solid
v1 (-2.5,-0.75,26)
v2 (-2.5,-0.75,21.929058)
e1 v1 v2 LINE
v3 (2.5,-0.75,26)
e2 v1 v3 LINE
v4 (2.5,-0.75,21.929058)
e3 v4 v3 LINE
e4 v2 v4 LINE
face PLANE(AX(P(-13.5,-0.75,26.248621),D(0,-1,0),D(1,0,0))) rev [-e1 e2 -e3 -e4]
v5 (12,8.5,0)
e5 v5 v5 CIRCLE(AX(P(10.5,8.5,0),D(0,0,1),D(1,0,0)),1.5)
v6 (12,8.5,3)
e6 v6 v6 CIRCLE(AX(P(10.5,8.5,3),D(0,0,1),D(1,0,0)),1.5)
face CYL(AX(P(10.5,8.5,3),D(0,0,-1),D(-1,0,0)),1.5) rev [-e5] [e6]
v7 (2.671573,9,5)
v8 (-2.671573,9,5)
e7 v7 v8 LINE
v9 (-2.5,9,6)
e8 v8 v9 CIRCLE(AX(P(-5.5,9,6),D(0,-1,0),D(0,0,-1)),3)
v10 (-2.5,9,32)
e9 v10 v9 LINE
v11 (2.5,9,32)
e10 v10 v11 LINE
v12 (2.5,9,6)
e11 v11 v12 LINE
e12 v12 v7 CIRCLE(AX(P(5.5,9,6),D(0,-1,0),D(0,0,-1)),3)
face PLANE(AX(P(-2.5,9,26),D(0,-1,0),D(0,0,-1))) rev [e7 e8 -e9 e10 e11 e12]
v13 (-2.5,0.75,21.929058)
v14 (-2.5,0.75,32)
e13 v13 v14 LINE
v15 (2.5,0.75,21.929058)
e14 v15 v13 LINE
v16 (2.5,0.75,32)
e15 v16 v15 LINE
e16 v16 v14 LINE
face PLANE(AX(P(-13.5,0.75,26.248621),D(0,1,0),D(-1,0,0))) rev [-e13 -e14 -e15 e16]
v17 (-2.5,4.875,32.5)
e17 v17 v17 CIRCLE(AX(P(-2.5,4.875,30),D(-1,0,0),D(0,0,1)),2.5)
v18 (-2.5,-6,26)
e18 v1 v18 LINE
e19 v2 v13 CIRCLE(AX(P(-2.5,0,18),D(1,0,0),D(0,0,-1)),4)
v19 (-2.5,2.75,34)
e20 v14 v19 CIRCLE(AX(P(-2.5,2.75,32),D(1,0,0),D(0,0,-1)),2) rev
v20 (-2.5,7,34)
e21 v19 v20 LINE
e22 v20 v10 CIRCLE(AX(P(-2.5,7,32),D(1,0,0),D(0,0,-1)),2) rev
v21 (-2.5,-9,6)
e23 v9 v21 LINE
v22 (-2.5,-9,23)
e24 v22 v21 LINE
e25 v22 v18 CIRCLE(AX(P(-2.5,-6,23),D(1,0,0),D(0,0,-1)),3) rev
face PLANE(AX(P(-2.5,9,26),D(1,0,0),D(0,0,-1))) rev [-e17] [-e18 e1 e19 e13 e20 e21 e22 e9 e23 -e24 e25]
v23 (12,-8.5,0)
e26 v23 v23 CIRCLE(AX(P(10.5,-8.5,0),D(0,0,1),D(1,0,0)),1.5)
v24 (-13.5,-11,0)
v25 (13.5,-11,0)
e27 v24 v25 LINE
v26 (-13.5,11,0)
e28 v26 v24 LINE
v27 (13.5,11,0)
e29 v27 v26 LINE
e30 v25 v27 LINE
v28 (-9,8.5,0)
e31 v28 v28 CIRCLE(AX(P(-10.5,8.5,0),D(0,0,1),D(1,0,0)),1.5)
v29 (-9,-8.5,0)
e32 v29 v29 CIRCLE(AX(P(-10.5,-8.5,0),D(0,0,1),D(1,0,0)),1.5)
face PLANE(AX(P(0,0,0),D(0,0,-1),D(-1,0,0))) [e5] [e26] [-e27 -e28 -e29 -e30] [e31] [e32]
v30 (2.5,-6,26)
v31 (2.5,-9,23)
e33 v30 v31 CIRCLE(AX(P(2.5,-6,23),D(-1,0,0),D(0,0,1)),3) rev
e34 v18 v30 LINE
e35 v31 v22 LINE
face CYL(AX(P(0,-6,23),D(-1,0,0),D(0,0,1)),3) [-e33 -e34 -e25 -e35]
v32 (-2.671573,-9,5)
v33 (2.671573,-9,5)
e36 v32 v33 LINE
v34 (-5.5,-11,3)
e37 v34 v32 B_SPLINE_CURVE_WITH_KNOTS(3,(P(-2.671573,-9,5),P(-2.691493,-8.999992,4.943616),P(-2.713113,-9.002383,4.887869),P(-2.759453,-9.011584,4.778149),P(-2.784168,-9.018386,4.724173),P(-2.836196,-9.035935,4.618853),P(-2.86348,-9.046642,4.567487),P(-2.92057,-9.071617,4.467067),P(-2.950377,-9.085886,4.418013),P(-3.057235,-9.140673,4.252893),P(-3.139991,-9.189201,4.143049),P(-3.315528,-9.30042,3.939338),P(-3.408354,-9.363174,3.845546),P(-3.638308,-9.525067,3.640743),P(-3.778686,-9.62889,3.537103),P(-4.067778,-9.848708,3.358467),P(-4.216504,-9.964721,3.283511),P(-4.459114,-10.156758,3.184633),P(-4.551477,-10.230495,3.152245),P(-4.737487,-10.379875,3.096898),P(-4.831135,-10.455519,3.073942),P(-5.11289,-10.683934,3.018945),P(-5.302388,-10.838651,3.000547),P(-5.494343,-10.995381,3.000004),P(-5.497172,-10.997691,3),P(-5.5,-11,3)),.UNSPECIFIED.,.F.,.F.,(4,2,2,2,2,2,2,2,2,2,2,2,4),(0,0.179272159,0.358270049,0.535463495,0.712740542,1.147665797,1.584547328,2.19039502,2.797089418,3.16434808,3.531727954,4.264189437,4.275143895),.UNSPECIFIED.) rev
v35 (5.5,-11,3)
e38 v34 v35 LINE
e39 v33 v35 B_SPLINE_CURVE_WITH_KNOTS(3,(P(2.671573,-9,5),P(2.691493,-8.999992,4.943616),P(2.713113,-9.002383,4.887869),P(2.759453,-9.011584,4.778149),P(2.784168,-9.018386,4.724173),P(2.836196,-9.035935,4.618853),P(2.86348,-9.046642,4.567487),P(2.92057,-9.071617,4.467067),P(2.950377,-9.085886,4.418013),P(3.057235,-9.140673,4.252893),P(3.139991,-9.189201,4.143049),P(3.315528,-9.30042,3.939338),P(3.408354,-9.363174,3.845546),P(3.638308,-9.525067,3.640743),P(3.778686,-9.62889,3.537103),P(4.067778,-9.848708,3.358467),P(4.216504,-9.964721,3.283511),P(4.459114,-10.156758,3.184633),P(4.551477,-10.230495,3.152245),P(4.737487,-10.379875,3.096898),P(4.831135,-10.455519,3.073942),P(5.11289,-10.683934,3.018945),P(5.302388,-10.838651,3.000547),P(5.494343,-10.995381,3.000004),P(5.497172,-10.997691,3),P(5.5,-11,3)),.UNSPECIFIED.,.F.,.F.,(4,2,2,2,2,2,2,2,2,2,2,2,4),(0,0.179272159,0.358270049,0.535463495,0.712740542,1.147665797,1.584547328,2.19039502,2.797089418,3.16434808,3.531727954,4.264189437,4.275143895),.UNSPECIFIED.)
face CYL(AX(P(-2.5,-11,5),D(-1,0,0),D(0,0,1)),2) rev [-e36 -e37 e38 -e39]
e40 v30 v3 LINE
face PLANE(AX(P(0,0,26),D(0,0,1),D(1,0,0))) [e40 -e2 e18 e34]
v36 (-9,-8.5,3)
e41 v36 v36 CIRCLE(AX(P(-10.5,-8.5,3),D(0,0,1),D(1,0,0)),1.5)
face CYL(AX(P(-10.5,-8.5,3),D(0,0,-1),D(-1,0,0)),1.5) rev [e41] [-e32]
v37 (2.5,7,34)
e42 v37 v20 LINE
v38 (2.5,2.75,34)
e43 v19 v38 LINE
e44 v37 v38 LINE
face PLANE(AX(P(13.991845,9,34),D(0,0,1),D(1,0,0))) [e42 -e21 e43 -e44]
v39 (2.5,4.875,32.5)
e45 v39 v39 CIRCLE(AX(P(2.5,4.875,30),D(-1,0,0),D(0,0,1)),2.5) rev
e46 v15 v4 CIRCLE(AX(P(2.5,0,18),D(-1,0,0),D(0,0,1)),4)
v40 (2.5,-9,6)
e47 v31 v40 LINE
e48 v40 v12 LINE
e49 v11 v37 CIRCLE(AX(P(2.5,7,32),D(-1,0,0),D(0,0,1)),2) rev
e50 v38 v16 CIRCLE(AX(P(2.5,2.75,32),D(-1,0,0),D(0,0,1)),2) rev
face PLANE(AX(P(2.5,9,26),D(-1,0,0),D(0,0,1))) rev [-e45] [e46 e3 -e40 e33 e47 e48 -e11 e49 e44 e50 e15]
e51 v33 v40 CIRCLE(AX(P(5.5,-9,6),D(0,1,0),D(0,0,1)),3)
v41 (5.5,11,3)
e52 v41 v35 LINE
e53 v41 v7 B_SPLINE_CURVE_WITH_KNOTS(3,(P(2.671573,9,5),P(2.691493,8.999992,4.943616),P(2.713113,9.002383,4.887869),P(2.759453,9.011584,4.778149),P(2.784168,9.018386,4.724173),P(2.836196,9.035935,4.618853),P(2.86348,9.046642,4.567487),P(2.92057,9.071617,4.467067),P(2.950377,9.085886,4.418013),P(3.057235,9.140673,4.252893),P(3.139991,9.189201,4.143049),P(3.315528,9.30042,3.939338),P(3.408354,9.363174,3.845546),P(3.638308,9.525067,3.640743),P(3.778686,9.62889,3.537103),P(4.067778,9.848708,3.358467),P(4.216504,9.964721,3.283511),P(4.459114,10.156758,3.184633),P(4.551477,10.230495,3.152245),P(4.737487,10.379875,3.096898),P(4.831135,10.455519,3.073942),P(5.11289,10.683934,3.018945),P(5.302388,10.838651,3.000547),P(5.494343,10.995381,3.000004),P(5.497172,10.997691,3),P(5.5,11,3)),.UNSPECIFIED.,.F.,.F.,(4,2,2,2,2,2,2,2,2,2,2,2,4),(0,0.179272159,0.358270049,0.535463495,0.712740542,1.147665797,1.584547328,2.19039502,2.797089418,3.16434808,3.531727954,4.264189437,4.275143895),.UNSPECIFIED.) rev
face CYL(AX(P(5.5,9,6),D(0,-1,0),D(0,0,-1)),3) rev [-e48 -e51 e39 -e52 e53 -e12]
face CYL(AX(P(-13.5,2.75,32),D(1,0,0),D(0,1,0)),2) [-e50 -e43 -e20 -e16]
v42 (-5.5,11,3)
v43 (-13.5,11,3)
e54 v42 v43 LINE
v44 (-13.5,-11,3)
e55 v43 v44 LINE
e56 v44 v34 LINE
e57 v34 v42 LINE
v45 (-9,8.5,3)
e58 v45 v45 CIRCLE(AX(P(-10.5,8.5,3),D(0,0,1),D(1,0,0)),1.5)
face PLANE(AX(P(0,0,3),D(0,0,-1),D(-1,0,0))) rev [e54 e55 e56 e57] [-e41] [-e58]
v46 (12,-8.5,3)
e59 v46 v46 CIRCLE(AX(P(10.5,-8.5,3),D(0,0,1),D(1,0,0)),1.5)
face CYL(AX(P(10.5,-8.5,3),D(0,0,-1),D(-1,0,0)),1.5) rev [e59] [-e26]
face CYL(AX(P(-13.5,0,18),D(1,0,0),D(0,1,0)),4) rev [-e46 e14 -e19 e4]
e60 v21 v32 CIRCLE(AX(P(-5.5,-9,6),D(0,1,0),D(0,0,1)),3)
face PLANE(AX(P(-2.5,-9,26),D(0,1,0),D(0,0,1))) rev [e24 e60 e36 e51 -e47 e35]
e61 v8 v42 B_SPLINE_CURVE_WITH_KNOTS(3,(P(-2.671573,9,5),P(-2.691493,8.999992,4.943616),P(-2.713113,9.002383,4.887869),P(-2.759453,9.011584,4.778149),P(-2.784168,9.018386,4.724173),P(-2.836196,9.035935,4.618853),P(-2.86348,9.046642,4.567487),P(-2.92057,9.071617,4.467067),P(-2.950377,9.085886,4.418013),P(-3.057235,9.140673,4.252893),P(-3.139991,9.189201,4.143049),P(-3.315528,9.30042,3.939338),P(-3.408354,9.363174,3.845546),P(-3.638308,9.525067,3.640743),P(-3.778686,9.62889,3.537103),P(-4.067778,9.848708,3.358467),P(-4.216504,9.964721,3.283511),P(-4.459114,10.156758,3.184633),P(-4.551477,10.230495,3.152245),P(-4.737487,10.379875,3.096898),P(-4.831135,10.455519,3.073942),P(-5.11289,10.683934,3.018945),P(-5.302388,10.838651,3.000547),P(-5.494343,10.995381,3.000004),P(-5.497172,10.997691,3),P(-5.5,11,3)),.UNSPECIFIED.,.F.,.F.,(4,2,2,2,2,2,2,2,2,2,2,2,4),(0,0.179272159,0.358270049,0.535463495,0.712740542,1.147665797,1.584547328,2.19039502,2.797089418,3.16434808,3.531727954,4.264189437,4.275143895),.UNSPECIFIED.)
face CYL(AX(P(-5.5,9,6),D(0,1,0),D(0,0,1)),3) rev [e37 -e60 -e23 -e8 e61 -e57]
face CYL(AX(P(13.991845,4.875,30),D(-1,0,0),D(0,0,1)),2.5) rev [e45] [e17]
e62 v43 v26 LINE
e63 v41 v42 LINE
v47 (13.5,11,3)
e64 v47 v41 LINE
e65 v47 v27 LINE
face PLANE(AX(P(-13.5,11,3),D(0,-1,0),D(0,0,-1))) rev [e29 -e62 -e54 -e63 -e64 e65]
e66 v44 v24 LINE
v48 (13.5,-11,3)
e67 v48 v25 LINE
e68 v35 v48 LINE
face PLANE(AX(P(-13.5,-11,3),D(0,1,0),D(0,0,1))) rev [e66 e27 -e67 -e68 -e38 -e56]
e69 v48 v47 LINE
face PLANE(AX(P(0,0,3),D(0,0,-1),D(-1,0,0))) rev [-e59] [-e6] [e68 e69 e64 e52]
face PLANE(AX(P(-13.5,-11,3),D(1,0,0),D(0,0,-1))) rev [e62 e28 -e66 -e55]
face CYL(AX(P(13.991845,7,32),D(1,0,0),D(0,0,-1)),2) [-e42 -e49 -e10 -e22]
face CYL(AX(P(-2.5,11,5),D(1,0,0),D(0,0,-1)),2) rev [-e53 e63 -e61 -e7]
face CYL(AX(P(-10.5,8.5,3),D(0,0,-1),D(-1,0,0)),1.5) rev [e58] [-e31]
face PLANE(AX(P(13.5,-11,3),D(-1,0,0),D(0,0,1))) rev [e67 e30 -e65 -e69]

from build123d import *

# Parameters (mm, degrees)
SKETCH1_W               = 27
SKETCH1_H               = 22
SKETCH1_R               = 1.5
BOSS_EXTRUDE1_DEPTH     = 3
SKETCH2_W               = 5
SKETCH2_H               = 18
BOSS_EXTRUDE2_DEPTH     = 23
CUT_EXTRUDE1_DEPTH      = 33.449961479
CUT_EXTRUDE1_DEPTH_BACK = 33.449961479
SKETCH3_R               = 4
CUT_EXTRUDE2_DEPTH      = 33.449961479
CUT_EXTRUDE2_DEPTH_BACK = 33.449961479
SKETCH4_W               = 9.515030356
SKETCH4_H               = 1.5
FILLET1_R               = 3
FILLET2_R               = 2
FILLET3_R               = 3
SKETCH6_W               = 8
SKETCH6_H               = 8.25
SKETCH6_R               = 2.5
BOSS_EXTRUDE3_DEPTH     = 5
FILLET4_R               = 2


with BuildPart() as part:
    # Sketch1 → Boss-Extrude1 (new body)
    with BuildSketch(Plane.XY):
        Rectangle(SKETCH1_W, SKETCH1_H)
        with Locations((-10.5, -8.5)):
            Circle(SKETCH1_R, mode=Mode.SUBTRACT)
        with Locations((-10.5, 8.5)):
            Circle(SKETCH1_R, mode=Mode.SUBTRACT)
        with Locations((10.5, 8.5)):
            Circle(SKETCH1_R, mode=Mode.SUBTRACT)
        with Locations((10.5, -8.5)):
            Circle(SKETCH1_R, mode=Mode.SUBTRACT)
    extrude(amount=BOSS_EXTRUDE1_DEPTH)

    # Sketch2 → Boss-Extrude2 (add)
    with BuildSketch(Plane.XY.offset(3)):
        Rectangle(SKETCH2_W, SKETCH2_H)
    extrude(amount=BOSS_EXTRUDE2_DEPTH)

    # Sketch3 → Cut-Extrude1 (cut, two sides: drawn at the far end of the back side and taken through both)
    with BuildSketch(Plane(origin=(2.5, 0, 0), x_dir=(0, 0, -1), z_dir=(1, 0, 0)).offset(-CUT_EXTRUDE1_DEPTH_BACK)):
        with Locations(Location((-18, 0, 0), (0, 0, 180))):
            Circle(SKETCH3_R)
    extrude(amount=CUT_EXTRUDE1_DEPTH + CUT_EXTRUDE1_DEPTH_BACK, mode=Mode.SUBTRACT)

    # Sketch4 → Cut-Extrude2 (cut, two sides: drawn at the far end of the back side and taken through both)
    with BuildSketch(Plane(origin=(2.5, 0, 0), x_dir=(0, 0, -1), z_dir=(1, 0, 0)).offset(-CUT_EXTRUDE2_DEPTH_BACK)):
        with Locations((-21.491106051, 0)):
            Rectangle(SKETCH4_W, SKETCH4_H)
    extrude(amount=CUT_EXTRUDE2_DEPTH + CUT_EXTRUDE2_DEPTH_BACK, mode=Mode.SUBTRACT)

    # Fillet1
    fillet1_edges = [part.edges().sort_by_distance(p)[0] for p in [
        (-2.5, 0, 3),
        (2.5, 0, 3),
    ]]
    fillet(fillet1_edges, radius=FILLET1_R)

    # Fillet2
    fillet2_edges = [part.edges().sort_by_distance(p)[0] for p in [
        (0, -9, 3),
        (0, 9, 3),
    ]]
    fillet(fillet2_edges, radius=FILLET2_R - 0.0001)  # a hair under: the kernel refuses the full size

    # Fillet3
    fillet3_edges = [part.edges().sort_by_distance(p)[0] for p in [
        (0, -9, 26),
    ]]
    fillet(fillet3_edges, radius=FILLET3_R)

    # Sketch6 → Boss-Extrude3 (add)
    with BuildSketch(Plane.ZY.offset(2.5)):
        with Locations((30, 4.875)):
            Rectangle(SKETCH6_W, SKETCH6_H)
        with Locations((30, 4.875)):
            Circle(SKETCH6_R, mode=Mode.SUBTRACT)
    extrude(amount=-BOSS_EXTRUDE3_DEPTH)

    # Fillet4
    fillet4_edges = [part.edges().sort_by_distance(p)[0] for p in [
        (0, 0.75, 34),
        (0, 9, 34),
    ]]
    fillet(fillet4_edges, radius=FILLET4_R)


solid = part.part
